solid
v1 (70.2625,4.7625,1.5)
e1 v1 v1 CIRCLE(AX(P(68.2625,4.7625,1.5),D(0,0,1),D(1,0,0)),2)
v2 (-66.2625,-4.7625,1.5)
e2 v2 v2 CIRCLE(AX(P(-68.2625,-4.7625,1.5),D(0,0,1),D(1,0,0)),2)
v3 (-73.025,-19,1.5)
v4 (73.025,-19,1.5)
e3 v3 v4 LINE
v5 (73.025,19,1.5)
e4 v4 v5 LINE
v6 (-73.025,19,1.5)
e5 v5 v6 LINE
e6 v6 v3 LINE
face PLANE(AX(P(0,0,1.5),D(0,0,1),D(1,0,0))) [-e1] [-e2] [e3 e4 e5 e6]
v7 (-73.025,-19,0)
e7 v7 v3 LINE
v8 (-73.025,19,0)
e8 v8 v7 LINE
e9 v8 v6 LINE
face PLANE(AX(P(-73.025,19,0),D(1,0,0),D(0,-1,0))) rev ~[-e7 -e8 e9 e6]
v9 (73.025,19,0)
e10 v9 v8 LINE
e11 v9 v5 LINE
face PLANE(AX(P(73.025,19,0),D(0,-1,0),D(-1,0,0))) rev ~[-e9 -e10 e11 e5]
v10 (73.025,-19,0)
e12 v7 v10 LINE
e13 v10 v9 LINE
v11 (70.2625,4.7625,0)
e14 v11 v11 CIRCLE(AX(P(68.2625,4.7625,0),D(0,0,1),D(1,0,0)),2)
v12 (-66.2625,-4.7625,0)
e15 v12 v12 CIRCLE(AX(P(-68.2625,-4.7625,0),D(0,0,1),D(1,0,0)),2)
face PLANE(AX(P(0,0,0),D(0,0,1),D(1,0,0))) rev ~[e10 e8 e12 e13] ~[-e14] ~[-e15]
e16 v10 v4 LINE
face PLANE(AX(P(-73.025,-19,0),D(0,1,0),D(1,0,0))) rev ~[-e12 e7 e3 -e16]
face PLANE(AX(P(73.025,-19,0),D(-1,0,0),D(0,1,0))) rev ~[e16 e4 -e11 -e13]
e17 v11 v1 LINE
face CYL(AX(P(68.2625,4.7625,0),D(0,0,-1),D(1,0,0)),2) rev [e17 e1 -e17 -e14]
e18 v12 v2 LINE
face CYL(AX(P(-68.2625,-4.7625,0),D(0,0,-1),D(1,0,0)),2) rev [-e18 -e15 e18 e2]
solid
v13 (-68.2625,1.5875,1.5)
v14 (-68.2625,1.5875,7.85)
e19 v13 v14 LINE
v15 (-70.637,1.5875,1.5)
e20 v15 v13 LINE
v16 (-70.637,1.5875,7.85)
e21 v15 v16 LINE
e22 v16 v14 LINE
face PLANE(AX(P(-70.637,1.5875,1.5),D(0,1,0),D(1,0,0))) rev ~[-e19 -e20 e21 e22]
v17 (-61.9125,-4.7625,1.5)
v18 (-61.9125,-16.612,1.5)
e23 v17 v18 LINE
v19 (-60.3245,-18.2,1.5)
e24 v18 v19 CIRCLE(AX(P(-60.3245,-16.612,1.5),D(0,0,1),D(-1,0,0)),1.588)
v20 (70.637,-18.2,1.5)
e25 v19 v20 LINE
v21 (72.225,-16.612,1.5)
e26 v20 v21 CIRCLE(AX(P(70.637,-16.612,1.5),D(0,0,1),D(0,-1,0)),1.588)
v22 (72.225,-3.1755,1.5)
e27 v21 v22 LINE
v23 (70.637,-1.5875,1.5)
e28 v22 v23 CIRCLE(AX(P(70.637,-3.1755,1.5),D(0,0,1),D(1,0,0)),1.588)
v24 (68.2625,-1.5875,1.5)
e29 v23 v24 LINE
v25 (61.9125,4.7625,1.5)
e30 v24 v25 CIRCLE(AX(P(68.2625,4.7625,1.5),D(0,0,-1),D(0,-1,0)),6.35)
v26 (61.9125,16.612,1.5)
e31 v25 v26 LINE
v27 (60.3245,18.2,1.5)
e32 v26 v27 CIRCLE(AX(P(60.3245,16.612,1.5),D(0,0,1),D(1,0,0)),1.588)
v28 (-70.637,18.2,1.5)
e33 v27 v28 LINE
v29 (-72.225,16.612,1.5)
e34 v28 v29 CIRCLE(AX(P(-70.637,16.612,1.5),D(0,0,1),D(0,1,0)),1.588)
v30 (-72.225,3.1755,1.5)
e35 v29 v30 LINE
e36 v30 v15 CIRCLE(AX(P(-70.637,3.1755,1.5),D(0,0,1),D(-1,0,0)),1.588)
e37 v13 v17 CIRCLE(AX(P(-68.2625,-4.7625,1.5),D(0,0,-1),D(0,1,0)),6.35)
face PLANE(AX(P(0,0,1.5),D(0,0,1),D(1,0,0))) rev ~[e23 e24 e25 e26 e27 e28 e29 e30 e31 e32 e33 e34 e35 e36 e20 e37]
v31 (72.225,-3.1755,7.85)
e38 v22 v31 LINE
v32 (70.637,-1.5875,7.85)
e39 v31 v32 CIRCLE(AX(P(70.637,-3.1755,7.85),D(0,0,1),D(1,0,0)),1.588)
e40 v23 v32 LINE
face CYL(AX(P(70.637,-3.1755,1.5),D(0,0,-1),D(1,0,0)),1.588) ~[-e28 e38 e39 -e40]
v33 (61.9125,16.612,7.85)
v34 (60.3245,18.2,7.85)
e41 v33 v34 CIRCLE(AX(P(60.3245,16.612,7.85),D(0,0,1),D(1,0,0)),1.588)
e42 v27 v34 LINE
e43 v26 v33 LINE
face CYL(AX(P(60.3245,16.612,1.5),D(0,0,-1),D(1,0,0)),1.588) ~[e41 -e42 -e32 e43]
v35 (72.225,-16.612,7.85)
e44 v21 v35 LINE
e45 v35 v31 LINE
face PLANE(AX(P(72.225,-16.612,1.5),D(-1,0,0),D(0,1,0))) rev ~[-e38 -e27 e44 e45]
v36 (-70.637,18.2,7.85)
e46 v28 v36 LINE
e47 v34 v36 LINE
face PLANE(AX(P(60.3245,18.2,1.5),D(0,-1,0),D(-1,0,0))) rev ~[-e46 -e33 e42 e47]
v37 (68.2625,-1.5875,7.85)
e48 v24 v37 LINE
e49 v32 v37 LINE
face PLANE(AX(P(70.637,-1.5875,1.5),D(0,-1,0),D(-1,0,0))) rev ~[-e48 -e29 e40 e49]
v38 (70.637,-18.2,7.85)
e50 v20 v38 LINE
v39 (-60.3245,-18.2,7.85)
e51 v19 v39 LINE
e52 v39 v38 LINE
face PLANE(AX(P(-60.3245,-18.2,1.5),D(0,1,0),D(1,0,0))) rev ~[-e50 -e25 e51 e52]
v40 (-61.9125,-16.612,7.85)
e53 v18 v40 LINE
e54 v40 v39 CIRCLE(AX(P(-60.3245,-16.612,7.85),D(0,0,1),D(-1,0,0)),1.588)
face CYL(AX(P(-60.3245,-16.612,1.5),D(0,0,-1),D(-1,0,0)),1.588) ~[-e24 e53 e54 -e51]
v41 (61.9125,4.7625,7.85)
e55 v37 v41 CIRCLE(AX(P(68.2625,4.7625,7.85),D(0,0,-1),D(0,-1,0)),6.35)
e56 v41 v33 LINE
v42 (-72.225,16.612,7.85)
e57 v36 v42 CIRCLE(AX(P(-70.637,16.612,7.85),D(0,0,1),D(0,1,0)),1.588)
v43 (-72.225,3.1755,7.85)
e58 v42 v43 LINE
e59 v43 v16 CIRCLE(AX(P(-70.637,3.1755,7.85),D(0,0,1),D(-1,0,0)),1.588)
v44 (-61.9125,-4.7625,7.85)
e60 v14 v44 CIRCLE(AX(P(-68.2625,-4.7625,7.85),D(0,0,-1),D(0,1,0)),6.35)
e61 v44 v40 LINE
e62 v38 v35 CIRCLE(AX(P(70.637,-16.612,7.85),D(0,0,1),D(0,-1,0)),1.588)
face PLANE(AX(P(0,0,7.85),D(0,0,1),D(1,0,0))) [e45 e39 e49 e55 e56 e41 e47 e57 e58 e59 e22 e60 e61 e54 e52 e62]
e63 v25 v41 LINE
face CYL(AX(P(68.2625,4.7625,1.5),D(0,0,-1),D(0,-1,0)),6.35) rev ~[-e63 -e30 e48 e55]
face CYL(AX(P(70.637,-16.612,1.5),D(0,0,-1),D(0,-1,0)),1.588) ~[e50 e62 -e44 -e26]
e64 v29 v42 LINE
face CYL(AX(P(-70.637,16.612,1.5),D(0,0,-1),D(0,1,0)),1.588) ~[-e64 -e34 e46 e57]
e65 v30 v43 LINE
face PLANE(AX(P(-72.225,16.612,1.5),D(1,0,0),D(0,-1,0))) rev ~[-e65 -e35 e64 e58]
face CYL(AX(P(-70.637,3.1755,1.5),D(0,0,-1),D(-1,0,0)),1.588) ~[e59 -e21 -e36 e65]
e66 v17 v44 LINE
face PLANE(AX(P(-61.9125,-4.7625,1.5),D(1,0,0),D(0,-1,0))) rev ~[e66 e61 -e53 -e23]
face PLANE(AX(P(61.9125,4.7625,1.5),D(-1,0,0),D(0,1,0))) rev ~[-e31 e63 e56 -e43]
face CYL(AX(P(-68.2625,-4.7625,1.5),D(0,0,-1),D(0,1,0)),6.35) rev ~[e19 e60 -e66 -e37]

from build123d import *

# Parameters (mm, degrees)
F0_R     = 2
F0_R_2   = 4.7625
F1_DEPTH = 1.5
F3_DEPTH = 6.35


# Not quite as in the source:
# - a feature names something its author has since deleted; it is built from what else it names


with BuildPart() as f1:
    # F0 (on Top) → F1 (new body)
    with BuildSketch(Plane.XY):
        with BuildLine():
            Line((-73.025, 19), (-73.025, 1.5875))
            Line((-73.025, 1.5875), (-68.2625, 1.5875))
            ThreePointArc((-68.2625, 1.5875), (-61.9125, -4.7625), (-68.2625, -11.1125))
            Line((-68.2625, -11.1125), (-73.025, -11.1125))
            Line((-73.025, -11.1125), (-73.025, -19))
            Line((-73.025, -19), (73.025, -19))
            Line((73.025, -19), (73.025, -1.5875))
            Line((73.025, -1.5875), (68.2625, -1.5875))
            ThreePointArc((68.2625, -1.5875), (61.9125, 4.7625), (68.2625, 11.1125))
            Line((68.2625, 11.1125), (73.025, 11.1125))
            Line((73.025, 11.1125), (73.025, 19))
            Line((73.025, 19), (-73.025, 19))
        make_face()
        with BuildLine():
            Line((-73.025, 1.5875), (-73.025, -4.7625))
            Line((-73.025, -4.7625), (-73.025, -11.1125))
            Line((-73.025, -11.1125), (-68.2625, -11.1125))
            ThreePointArc((-68.2625, -11.1125), (-61.9125, -4.7625), (-68.2625, 1.5875))
            Line((-68.2625, 1.5875), (-73.025, 1.5875))
        make_face()
        with BuildLine():
            ThreePointArc((-73.025, -4.7625), (-68.2625, 0), (-63.5, -4.7625))
            ThreePointArc((-63.5, -4.7625), (-68.2625, -9.525), (-73.025, -4.7625))
        make_face(mode=Mode.SUBTRACT)
        with BuildLine():
            ThreePointArc((-73.025, -4.7625), (-68.2625, -9.525), (-63.5, -4.7625))
            ThreePointArc((-63.5, -4.7625), (-68.2625, 0), (-73.025, -4.7625))
        make_face()
        with Locations((-68.2625, -4.7625)):
            Circle(F0_R, mode=Mode.SUBTRACT)
        with BuildLine():
            Line((73.025, 4.7625), (73.025, 11.1125))
            Line((73.025, 11.1125), (68.2625, 11.1125))
            ThreePointArc((68.2625, 11.1125), (61.9125, 4.7625), (68.2625, -1.5875))
            Line((68.2625, -1.5875), (73.025, -1.5875))
            Line((73.025, -1.5875), (73.025, 4.7625))
        make_face()
        with Locations((68.2625, 4.7625)):
            Circle(F0_R_2, mode=Mode.SUBTRACT)
        with Locations((68.2625, 4.7625)):
            Circle(F0_R_2)
        with Locations((68.2625, 4.7625)):
            Circle(F0_R, mode=Mode.SUBTRACT)
    extrude(amount=F1_DEPTH)


with BuildPart() as f3:
    # F2 (on face) → F3 (new body)
    with BuildSketch(Plane.XY.offset(1.5)):
        with BuildLine():
            Line((70.637, -1.5875), (68.2625, -1.5875))
            ThreePointArc((68.2625, -1.5875), (63.7723719395, 0.2723719395), (61.9125, 4.7625))
            Line((61.9125, 4.7625), (61.9125, 16.612))
            ThreePointArc((61.9125, 16.612), (61.4473855685, 17.7348855685), (60.3245, 18.2))
            Line((60.3245, 18.2), (-70.637, 18.2))
            ThreePointArc((-70.637, 18.2), (-71.7598855685, 17.7348855685), (-72.225, 16.612))
            Line((-72.225, 16.612), (-72.225, 3.1755))
            ThreePointArc((-72.225, 3.1755), (-71.7598855685, 2.0526144315), (-70.637, 1.5875))
            Line((-70.637, 1.5875), (-68.2625, 1.5875))
            ThreePointArc((-68.2625, 1.5875), (-63.7723719395, -0.2723719395), (-61.9125, -4.7625))
            Line((-61.9125, -4.7625), (-61.9125, -16.612))
            ThreePointArc((-61.9125, -16.612), (-61.4473855685, -17.7348855685), (-60.3245, -18.2))
            Line((-60.3245, -18.2), (70.637, -18.2))
            ThreePointArc((70.637, -18.2), (71.7598855685, -17.7348855685), (72.225, -16.612))
            Line((72.225, -16.612), (72.225, -3.1755))
            ThreePointArc((72.225, -3.1755), (71.7598855685, -2.0526144315), (70.637, -1.5875))
        make_face()
    extrude(amount=F3_DEPTH)


solid = Compound([f1.part, f3.part])
